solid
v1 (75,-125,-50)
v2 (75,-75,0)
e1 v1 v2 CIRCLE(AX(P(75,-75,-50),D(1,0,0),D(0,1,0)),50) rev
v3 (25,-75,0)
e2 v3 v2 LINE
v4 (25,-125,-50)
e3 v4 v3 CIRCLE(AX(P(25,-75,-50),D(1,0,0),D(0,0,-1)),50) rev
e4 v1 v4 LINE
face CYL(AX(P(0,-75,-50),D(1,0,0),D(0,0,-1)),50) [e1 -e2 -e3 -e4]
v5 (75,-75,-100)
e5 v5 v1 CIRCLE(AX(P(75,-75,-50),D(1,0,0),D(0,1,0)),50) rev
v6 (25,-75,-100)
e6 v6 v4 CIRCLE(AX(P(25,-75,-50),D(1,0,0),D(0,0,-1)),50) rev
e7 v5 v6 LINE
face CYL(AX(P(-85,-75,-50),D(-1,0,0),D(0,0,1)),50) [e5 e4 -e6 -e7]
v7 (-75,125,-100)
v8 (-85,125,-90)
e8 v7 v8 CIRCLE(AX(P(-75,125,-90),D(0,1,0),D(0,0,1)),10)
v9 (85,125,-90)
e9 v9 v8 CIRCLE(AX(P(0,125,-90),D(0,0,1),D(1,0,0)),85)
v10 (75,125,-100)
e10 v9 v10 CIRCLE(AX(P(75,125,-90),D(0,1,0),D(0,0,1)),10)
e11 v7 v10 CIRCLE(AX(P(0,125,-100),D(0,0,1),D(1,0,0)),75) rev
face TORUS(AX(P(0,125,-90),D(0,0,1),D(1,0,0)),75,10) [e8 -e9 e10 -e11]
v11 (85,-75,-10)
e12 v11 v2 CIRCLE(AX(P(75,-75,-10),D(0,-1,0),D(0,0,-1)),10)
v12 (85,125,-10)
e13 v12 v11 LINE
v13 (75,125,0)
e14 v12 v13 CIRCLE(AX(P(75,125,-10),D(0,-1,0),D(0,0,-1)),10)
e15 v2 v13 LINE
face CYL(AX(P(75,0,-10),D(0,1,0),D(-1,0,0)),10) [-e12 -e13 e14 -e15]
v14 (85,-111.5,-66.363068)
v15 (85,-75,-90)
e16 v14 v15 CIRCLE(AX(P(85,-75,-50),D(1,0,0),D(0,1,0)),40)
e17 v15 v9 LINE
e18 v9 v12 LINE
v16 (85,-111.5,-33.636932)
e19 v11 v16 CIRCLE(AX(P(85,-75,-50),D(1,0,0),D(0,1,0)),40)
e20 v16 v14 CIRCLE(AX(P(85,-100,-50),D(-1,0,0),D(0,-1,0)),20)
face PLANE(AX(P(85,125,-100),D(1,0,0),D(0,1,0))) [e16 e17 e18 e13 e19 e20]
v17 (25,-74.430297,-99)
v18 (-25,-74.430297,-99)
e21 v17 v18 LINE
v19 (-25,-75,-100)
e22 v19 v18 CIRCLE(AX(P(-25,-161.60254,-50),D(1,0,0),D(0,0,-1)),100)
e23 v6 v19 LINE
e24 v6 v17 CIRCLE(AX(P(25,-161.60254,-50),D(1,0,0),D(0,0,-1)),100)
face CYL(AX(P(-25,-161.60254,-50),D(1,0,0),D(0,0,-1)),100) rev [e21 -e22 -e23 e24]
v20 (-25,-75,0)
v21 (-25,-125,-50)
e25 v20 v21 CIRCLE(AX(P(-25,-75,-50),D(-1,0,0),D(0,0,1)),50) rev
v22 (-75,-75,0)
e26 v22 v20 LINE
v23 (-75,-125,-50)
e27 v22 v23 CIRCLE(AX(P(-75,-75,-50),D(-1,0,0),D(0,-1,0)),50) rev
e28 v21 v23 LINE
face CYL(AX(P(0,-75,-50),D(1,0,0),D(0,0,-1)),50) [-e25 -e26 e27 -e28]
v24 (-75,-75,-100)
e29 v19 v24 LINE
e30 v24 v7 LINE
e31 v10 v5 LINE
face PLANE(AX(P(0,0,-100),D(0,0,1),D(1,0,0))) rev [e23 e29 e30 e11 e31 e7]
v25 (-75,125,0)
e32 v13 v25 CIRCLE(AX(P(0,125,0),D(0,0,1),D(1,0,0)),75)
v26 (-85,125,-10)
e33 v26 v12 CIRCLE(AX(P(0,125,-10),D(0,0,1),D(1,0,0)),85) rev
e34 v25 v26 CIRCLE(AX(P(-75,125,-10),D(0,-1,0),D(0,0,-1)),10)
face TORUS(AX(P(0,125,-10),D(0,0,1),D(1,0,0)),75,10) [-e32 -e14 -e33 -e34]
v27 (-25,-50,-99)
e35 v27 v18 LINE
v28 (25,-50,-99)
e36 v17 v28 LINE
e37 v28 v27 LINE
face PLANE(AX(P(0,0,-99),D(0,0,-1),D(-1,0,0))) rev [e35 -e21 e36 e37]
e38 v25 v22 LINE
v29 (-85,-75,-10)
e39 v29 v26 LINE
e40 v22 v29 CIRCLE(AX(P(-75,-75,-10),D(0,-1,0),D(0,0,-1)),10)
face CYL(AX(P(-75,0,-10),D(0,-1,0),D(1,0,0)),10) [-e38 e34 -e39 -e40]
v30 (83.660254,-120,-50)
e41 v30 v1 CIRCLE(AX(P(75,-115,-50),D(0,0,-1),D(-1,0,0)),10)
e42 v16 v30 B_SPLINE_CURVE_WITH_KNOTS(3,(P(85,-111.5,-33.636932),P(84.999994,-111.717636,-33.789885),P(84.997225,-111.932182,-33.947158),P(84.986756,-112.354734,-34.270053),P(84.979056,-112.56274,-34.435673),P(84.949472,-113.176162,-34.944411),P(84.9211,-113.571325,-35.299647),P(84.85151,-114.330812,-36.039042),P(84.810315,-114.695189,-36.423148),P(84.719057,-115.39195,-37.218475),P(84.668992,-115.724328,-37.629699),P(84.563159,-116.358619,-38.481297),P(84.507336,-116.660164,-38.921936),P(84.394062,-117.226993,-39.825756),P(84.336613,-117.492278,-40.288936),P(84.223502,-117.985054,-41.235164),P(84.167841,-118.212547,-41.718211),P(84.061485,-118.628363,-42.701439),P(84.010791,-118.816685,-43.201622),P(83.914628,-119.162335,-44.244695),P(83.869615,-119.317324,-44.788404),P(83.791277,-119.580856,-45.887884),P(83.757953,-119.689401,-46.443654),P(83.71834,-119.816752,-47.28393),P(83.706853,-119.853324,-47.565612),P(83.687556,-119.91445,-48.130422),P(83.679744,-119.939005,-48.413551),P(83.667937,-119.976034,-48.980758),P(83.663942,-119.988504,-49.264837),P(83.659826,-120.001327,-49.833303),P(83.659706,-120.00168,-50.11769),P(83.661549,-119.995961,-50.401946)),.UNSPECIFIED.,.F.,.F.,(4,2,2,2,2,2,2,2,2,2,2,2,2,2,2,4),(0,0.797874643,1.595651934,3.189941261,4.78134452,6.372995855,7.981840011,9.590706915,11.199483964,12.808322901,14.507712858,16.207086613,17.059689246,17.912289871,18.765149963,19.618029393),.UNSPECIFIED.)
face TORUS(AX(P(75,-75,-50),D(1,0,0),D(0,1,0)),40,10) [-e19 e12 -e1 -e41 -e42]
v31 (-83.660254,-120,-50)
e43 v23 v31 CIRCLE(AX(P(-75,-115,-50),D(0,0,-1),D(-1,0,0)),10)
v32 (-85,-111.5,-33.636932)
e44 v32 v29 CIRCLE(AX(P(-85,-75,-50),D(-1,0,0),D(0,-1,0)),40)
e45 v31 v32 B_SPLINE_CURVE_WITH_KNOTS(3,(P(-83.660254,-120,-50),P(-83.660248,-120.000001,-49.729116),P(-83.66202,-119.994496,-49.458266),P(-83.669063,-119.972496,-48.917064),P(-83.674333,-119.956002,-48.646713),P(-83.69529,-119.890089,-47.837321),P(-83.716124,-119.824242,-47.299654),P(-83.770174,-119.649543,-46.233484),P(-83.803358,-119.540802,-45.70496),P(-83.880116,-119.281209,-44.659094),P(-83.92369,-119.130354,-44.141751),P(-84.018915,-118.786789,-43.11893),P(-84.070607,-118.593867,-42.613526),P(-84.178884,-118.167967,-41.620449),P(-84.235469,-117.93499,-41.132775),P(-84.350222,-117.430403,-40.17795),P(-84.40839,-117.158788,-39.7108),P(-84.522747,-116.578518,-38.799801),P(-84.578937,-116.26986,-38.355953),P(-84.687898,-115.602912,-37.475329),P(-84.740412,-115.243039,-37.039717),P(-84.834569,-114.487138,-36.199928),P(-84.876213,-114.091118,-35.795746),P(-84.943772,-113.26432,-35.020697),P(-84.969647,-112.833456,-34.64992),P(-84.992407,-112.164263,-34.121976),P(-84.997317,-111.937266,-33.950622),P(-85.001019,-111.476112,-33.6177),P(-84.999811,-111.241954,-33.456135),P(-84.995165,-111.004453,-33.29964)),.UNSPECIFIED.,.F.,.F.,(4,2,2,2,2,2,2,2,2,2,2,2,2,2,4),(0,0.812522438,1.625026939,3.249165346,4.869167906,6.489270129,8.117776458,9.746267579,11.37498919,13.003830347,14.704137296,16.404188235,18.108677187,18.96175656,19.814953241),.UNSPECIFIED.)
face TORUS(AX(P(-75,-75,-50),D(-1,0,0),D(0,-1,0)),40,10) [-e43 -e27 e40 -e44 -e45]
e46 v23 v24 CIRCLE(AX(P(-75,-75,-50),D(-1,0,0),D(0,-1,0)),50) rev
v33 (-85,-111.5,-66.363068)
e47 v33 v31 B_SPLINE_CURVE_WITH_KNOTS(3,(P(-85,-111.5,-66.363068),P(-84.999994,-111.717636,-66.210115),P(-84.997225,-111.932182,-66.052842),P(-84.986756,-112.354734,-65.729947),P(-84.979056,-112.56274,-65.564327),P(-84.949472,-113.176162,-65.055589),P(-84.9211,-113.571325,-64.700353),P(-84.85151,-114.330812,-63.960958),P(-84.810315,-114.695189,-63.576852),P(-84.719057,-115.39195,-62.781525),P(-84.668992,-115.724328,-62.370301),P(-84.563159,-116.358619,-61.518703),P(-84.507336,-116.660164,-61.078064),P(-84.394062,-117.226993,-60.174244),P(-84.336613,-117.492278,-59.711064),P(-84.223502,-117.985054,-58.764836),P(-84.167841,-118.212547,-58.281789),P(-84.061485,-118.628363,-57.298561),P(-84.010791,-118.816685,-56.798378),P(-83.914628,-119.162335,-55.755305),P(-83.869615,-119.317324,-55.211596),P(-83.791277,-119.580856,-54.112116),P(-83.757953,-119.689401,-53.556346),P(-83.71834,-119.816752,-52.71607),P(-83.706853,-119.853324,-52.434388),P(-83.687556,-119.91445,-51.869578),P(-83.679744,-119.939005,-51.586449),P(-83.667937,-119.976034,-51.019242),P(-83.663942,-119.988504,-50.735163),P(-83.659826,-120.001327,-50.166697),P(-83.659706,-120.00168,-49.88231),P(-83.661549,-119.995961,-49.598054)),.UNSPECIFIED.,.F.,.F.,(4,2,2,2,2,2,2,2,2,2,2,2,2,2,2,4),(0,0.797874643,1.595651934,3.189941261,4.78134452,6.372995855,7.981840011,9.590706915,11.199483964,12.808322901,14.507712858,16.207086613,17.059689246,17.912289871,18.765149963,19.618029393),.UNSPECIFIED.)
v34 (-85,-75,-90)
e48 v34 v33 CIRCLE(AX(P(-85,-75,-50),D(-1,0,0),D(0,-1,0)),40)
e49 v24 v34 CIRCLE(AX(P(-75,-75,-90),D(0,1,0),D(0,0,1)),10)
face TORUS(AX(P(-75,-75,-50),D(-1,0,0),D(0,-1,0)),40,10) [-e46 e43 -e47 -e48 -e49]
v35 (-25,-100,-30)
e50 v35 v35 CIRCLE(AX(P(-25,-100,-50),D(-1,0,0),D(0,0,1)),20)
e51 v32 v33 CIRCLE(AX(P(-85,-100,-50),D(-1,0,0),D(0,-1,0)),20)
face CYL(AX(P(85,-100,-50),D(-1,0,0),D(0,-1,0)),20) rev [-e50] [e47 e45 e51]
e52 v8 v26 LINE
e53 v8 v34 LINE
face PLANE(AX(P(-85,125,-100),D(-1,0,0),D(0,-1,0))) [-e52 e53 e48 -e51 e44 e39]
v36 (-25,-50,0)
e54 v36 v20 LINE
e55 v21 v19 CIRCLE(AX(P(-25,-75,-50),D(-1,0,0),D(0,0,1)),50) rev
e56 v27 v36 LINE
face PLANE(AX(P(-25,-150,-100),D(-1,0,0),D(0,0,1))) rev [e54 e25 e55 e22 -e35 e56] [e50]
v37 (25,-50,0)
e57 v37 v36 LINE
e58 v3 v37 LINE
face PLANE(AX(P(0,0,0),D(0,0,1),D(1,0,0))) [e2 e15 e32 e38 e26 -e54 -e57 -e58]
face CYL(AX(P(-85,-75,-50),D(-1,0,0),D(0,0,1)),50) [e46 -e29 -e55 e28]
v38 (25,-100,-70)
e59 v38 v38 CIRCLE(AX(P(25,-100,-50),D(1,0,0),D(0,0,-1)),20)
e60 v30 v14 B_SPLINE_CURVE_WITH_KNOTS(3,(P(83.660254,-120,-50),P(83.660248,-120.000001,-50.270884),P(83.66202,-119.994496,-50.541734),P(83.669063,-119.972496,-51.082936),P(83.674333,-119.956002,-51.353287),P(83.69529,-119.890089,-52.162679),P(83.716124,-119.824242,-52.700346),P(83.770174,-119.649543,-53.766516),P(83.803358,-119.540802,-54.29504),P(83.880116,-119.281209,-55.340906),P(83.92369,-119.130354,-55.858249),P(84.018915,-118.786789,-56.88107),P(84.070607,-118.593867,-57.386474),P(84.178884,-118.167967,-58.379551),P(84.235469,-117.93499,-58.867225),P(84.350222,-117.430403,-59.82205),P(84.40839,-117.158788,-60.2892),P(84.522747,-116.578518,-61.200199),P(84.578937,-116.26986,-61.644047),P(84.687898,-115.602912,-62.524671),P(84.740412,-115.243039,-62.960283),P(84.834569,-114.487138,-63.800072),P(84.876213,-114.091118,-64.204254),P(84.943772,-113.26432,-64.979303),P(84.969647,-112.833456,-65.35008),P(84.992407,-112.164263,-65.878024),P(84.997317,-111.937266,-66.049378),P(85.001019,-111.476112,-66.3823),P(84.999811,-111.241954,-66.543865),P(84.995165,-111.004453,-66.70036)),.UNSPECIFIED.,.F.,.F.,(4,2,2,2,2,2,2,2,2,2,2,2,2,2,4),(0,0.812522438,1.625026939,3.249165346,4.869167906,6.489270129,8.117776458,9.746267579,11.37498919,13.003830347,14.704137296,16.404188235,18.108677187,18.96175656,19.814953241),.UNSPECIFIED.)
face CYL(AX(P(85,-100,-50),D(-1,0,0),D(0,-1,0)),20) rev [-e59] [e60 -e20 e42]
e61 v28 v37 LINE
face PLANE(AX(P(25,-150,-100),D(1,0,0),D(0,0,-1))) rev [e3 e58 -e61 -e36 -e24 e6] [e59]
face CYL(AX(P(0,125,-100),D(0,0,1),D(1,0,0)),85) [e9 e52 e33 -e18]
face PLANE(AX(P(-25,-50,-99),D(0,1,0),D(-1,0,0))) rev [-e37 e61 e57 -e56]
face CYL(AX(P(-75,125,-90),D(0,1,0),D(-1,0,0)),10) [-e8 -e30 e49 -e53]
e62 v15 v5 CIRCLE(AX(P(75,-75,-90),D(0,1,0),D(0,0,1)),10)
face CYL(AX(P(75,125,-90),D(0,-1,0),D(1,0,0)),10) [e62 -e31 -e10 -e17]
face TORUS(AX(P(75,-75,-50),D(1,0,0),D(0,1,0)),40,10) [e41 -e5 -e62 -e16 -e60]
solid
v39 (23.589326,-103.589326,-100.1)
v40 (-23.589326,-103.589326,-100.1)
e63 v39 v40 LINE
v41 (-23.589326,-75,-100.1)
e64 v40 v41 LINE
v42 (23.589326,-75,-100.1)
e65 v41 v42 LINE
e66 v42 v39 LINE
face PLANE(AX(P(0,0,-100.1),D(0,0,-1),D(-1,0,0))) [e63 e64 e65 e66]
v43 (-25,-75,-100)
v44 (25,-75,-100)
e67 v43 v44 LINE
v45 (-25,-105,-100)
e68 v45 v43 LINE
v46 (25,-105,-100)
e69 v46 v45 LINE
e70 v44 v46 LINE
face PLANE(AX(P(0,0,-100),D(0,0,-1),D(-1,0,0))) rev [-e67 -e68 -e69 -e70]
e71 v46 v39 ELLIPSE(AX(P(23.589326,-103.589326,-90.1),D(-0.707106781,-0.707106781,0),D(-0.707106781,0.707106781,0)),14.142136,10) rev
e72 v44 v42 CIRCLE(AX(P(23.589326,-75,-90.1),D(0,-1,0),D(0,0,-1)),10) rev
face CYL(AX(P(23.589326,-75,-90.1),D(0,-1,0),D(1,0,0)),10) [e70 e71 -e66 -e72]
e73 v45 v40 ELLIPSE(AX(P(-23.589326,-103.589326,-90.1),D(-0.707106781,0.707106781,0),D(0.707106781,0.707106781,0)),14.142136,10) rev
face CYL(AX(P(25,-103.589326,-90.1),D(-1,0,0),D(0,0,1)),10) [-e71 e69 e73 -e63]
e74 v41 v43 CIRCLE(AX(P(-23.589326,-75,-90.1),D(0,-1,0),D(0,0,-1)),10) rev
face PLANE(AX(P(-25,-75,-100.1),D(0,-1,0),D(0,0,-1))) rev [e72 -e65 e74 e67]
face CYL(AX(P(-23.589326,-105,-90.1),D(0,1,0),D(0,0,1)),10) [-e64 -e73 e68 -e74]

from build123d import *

# Parameters (mm, degrees)
BOSS_EXTRUDE1_DEPTH    = 100
SKETCH2_W              = 50
SKETCH2_H              = 50
CUT_EXTRUDE1_DEPTH     = 182.245689604
CUT_EXTRUDE2_DEPTH     = 25
SKETCH7_R              = 20
CUT_EXTRUDE3_DEPTH     = 234.505888577
FILLET2_R              = 50
CUT_EXTRUDE6_START     = -125
CUT_EXTRUDE6_OUTLINE_W = 50
CUT_EXTRUDE6_OUTLINE_H = 6.698729811
CUT_EXTRUDE6_DEPTH     = 50
CUT_EXTRUDE7_DEPTH     = 25
BOSS_EXTRUDE2_DEPTH    = 100
FILLET4_R              = 10
SKETCH11_W             = 50
SKETCH11_H             = 25
CUT_EXTRUDE11_DEPTH    = 99
SKETCH16_W             = 50
SKETCH16_H             = 30
BOSS_EXTRUDE3_DEPTH    = 0.1
FILLET5_R              = 10


with BuildPart() as part:
    # Sketch1 → Boss-Extrude1 (new body)
    with BuildSketch(Plane.XY):
        Polygon((-85, 125), (10.2, 125), (59.8, 125), (85, 125), (85, -125), (-85, -125), align=None)
    extrude(amount=-BOSS_EXTRUDE1_DEPTH)

    # Sketch2 → Cut-Extrude1 (cut, through all)
    with BuildSketch(Plane.XY):
        with Locations((0, -125)):
            Rectangle(SKETCH2_W, SKETCH2_H)
    extrude(amount=-CUT_EXTRUDE1_DEPTH, mode=Mode.SUBTRACT)

    # Sketch6 → Cut-Extrude2 (cut, symmetric)
    with BuildSketch(Plane(origin=(0, 0, 0), x_dir=(0, 0, -1), z_dir=(1, 0, 0))):
        with BuildLine():
            Line((100, -100), (0, -100))
            ThreePointArc((0, -100), (50, -50), (100, -100))
        make_face()
    extrude(amount=CUT_EXTRUDE2_DEPTH, both=True, mode=Mode.SUBTRACT)

    # Sketch7 → Cut-Extrude3 (cut, through all)
    with BuildSketch(Plane.ZY.offset(85)):
        with Locations(Location((-50, -100, 0), (0, 0, 270))):
            Circle(SKETCH7_R)
    extrude(amount=-CUT_EXTRUDE3_DEPTH, mode=Mode.SUBTRACT)

    # Fillet2
    fillet2_edges = [part.edges().sort_by_distance(p)[0] for p in [
        (-55, -125, -100),
        (-55, -125, 0),
    ]]
    fillet(fillet2_edges, radius=FILLET2_R - 0.0001)  # a hair under: the kernel refuses the full size

    # Cut-Extrude6: read off the stored shape, not the designer's step
    # Cut-Extrude6 outline → Cut-Extrude6 (cut)
    with BuildSketch(Plane(origin=(0, 0, 0), x_dir=(1, 0, 0), z_dir=(0, 1, 0)).offset(CUT_EXTRUDE6_START)):
        with Locations((0, 96.650635095)):
            Rectangle(CUT_EXTRUDE6_OUTLINE_W, CUT_EXTRUDE6_OUTLINE_H)
        with Locations((0, 3.349364906)):
            Rectangle(CUT_EXTRUDE6_OUTLINE_W, CUT_EXTRUDE6_OUTLINE_H)
    extrude(amount=CUT_EXTRUDE6_DEPTH, mode=Mode.SUBTRACT)

    # Sketch10 → Cut-Extrude7 (cut, symmetric)
    with BuildSketch(Plane(origin=(0, 0, 0), x_dir=(0, 0, -1), z_dir=(1, 0, 0))):
        with BuildLine():
            Line((0, -75), (100, -75))
            ThreePointArc((100, -75), (50, -61.602540378), (0, -75))
        make_face()
    extrude(amount=CUT_EXTRUDE7_DEPTH, both=True, mode=Mode.SUBTRACT)

    # Sketch15 → Boss-Extrude2 (add)
    with BuildSketch(Plane.XY):
        with BuildLine():
            Line((-85, 125), (85, 125))
            ThreePointArc((85, 125), (0, 210), (-85, 125))
        make_face()
    extrude(amount=-BOSS_EXTRUDE2_DEPTH)

    # Fillet4
    # the kernel refuses this fillet: 10 mm, written as the material it takes off along each edge
    with BuildSketch(Plane(origin=(0, 125, -100), x_dir=(1, 0, 0), z_dir=(0, -1, 0))) as fillet4_piece_1:
        with BuildLine():
            CenterArc((85 - FILLET4_R, FILLET4_R), FILLET4_R, 270, 90)
            Line((85, FILLET4_R), (85, 0))
            Line((85, 0), (85 - FILLET4_R, 0))
        make_face()
    revolve(axis=Axis((0, 125, -100), (0, 0, 1)), revolution_arc=180, mode=Mode.SUBTRACT)
    with BuildSketch(Plane(origin=(0, 125, 0), x_dir=(1, 0, 0), z_dir=(0, -1, 0))) as fillet4_piece_2:
        with BuildLine():
            CenterArc((85 - FILLET4_R, -FILLET4_R), FILLET4_R, 0, 90)
            Line((85, -FILLET4_R), (85, 0))
            Line((85, 0), (85 - FILLET4_R, 0))
        make_face()
    revolve(axis=Axis((0, 125, 0), (0, 0, 1)), revolution_arc=180, mode=Mode.SUBTRACT)
    with BuildSketch(Plane(origin=(-85, -75.0001, -100), x_dir=(0, 0, 1), z_dir=(0, 1, 0)), Plane(origin=(85, 125, 0), x_dir=(-1, 0, 0), z_dir=(0, -1, 0))) as fillet4_piece_3:
        with BuildLine():
            CenterArc((FILLET4_R, FILLET4_R), FILLET4_R, 180, 90)
            Line((0, FILLET4_R), (0, 0))
            Line((0, 0), (FILLET4_R, 0))
        make_face()
    extrude(amount=200.0001, mode=Mode.SUBTRACT)
    with BuildSketch(Plane(origin=(85, 125, -100), x_dir=(-1, 0, 0), z_dir=(0, -1, 0)), Plane(origin=(-85, -75.0001, 0), x_dir=(0, 0, -1), z_dir=(0, 1, 0))) as fillet4_piece_4:
        with BuildLine():
            CenterArc((FILLET4_R, -FILLET4_R), FILLET4_R, 90, 90)
            Line((0, -FILLET4_R), (0, 0))
            Line((0, 0), (FILLET4_R, 0))
        make_face()
    extrude(amount=200.0001, mode=Mode.SUBTRACT)
    with BuildSketch(Plane(origin=(85, -75.0001, -49.9999), x_dir=(0, 0, 1), z_dir=(0, 1, 0))) as fillet4_piece_5:
        with BuildLine():
            CenterArc((49.9999 - FILLET4_R, -FILLET4_R), FILLET4_R, 0, 90)
            Line((49.9999 - FILLET4_R, 0), (49.9999, 0))
            Line((49.9999, 0), (49.9999, -FILLET4_R))
        make_face()
    revolve(axis=Axis((85, -75.0001, -49.9999), (1, 0, 0)), revolution_arc=90, mode=Mode.SUBTRACT)
    with BuildSketch(Plane(origin=(85, -75.0001, -50.0001), x_dir=(0, 0, -1), z_dir=(0, 1, 0))) as fillet4_piece_6:
        with BuildLine():
            CenterArc((49.9999 - FILLET4_R, FILLET4_R), FILLET4_R, 270, 90)
            Line((49.9999, FILLET4_R), (49.9999, 0))
            Line((49.9999, 0), (49.9999 - FILLET4_R, 0))
        make_face()
    revolve(axis=Axis((85, -75.0001, -50.0001), (-1, 0, 0)), revolution_arc=90, mode=Mode.SUBTRACT)
    with BuildSketch(Plane(origin=(-85, -75.0001, -49.9999), x_dir=(0, 0, 1), z_dir=(0, 1, 0))) as fillet4_piece_7:
        with BuildLine():
            CenterArc((49.9999 - FILLET4_R, FILLET4_R), FILLET4_R, 270, 90)
            Line((49.9999, FILLET4_R), (49.9999, 0))
            Line((49.9999, 0), (49.9999 - FILLET4_R, 0))
        make_face()
    revolve(axis=Axis((-85, -75.0001, -49.9999), (1, 0, 0)), revolution_arc=90, mode=Mode.SUBTRACT)
    with BuildSketch(Plane(origin=(-85, -75.0001, -50.0001), x_dir=(0, 0, -1), z_dir=(0, 1, 0))) as fillet4_piece_8:
        with BuildLine():
            CenterArc((49.9999 - FILLET4_R, -FILLET4_R), FILLET4_R, 0, 90)
            Line((49.9999, -FILLET4_R), (49.9999, 0))
            Line((49.9999, 0), (49.9999 - FILLET4_R, 0))
        make_face()
    revolve(axis=Axis((-85, -75.0001, -50.0001), (-1, 0, 0)), revolution_arc=90, mode=Mode.SUBTRACT)
    with BuildSketch(Plane(origin=(-85, -125, -49.9999), x_dir=(0, 1, 0), z_dir=(0, 0, -1))) as fillet4_piece_9:
        with BuildLine():
            CenterArc((FILLET4_R, FILLET4_R), FILLET4_R, 180, 90)
            Line((0, FILLET4_R), (0, 0))
            Line((0, 0), (FILLET4_R, 0))
        make_face()
    extrude(amount=0.0002, mode=Mode.SUBTRACT)
    with BuildSketch(Plane(origin=(85, -125, -49.9999), x_dir=(0, 1, 0), z_dir=(0, 0, -1))) as fillet4_piece_10:
        with BuildLine():
            CenterArc((FILLET4_R, -FILLET4_R), FILLET4_R, 90, 90)
            Line((0, -FILLET4_R), (0, 0))
            Line((0, 0), (FILLET4_R, 0))
        make_face()
    extrude(amount=0.0002, mode=Mode.SUBTRACT)

    # Sketch11 → Cut-Extrude11 (cut)
    with BuildSketch(Plane.XY):
        with Locations((0, -62.5)):
            Rectangle(SKETCH11_W, SKETCH11_H)
    extrude(amount=-CUT_EXTRUDE11_DEPTH, mode=Mode.SUBTRACT)


with BuildPart() as body_2:
    # Sketch16 → Boss-Extrude3 (new body)
    with BuildSketch(Plane(origin=(0, 0, -100), x_dir=(-1, 0, 0), z_dir=(0, 0, -1))):
        with Locations((0, -90)):
            Rectangle(SKETCH16_W, SKETCH16_H)
    extrude(amount=BOSS_EXTRUDE3_DEPTH)

    # Fillet5
    # the kernel refuses this fillet: 10 mm, written as the material it takes off along each edge
    with BuildSketch(Plane(origin=(25, -71.473316005, -100.1), x_dir=(0, 0, 1), z_dir=(0, -1, 0)), Plane(origin=(-25, -108.526683995, -100.1), x_dir=(0, 0, 1), z_dir=(0, 1, 0))) as fillet5_piece_1:
        with BuildLine():
            CenterArc((10, 1.410673598), FILLET5_R, 180, 8.109614456)
            Line((0, 1.410673598), (0, 0))
            Line((0, 0), (0.1, 0))
        make_face()
    extrude(amount=37.05336799, mode=Mode.SUBTRACT)
    with BuildSketch(Plane(origin=(28.526683995, -105, -100.1), x_dir=(0, 0, 1), z_dir=(-1, 0, 0))) as fillet5_piece_2:
        with BuildLine():
            CenterArc((10, 1.410673598), FILLET5_R, 180, 8.109614456)
            Line((0, 1.410673598), (0, 0))
            Line((0, 0), (0.1, 0))
        make_face()
    extrude(amount=57.05336799, mode=Mode.SUBTRACT)


solid = Compound([part.part, body_2.part])
